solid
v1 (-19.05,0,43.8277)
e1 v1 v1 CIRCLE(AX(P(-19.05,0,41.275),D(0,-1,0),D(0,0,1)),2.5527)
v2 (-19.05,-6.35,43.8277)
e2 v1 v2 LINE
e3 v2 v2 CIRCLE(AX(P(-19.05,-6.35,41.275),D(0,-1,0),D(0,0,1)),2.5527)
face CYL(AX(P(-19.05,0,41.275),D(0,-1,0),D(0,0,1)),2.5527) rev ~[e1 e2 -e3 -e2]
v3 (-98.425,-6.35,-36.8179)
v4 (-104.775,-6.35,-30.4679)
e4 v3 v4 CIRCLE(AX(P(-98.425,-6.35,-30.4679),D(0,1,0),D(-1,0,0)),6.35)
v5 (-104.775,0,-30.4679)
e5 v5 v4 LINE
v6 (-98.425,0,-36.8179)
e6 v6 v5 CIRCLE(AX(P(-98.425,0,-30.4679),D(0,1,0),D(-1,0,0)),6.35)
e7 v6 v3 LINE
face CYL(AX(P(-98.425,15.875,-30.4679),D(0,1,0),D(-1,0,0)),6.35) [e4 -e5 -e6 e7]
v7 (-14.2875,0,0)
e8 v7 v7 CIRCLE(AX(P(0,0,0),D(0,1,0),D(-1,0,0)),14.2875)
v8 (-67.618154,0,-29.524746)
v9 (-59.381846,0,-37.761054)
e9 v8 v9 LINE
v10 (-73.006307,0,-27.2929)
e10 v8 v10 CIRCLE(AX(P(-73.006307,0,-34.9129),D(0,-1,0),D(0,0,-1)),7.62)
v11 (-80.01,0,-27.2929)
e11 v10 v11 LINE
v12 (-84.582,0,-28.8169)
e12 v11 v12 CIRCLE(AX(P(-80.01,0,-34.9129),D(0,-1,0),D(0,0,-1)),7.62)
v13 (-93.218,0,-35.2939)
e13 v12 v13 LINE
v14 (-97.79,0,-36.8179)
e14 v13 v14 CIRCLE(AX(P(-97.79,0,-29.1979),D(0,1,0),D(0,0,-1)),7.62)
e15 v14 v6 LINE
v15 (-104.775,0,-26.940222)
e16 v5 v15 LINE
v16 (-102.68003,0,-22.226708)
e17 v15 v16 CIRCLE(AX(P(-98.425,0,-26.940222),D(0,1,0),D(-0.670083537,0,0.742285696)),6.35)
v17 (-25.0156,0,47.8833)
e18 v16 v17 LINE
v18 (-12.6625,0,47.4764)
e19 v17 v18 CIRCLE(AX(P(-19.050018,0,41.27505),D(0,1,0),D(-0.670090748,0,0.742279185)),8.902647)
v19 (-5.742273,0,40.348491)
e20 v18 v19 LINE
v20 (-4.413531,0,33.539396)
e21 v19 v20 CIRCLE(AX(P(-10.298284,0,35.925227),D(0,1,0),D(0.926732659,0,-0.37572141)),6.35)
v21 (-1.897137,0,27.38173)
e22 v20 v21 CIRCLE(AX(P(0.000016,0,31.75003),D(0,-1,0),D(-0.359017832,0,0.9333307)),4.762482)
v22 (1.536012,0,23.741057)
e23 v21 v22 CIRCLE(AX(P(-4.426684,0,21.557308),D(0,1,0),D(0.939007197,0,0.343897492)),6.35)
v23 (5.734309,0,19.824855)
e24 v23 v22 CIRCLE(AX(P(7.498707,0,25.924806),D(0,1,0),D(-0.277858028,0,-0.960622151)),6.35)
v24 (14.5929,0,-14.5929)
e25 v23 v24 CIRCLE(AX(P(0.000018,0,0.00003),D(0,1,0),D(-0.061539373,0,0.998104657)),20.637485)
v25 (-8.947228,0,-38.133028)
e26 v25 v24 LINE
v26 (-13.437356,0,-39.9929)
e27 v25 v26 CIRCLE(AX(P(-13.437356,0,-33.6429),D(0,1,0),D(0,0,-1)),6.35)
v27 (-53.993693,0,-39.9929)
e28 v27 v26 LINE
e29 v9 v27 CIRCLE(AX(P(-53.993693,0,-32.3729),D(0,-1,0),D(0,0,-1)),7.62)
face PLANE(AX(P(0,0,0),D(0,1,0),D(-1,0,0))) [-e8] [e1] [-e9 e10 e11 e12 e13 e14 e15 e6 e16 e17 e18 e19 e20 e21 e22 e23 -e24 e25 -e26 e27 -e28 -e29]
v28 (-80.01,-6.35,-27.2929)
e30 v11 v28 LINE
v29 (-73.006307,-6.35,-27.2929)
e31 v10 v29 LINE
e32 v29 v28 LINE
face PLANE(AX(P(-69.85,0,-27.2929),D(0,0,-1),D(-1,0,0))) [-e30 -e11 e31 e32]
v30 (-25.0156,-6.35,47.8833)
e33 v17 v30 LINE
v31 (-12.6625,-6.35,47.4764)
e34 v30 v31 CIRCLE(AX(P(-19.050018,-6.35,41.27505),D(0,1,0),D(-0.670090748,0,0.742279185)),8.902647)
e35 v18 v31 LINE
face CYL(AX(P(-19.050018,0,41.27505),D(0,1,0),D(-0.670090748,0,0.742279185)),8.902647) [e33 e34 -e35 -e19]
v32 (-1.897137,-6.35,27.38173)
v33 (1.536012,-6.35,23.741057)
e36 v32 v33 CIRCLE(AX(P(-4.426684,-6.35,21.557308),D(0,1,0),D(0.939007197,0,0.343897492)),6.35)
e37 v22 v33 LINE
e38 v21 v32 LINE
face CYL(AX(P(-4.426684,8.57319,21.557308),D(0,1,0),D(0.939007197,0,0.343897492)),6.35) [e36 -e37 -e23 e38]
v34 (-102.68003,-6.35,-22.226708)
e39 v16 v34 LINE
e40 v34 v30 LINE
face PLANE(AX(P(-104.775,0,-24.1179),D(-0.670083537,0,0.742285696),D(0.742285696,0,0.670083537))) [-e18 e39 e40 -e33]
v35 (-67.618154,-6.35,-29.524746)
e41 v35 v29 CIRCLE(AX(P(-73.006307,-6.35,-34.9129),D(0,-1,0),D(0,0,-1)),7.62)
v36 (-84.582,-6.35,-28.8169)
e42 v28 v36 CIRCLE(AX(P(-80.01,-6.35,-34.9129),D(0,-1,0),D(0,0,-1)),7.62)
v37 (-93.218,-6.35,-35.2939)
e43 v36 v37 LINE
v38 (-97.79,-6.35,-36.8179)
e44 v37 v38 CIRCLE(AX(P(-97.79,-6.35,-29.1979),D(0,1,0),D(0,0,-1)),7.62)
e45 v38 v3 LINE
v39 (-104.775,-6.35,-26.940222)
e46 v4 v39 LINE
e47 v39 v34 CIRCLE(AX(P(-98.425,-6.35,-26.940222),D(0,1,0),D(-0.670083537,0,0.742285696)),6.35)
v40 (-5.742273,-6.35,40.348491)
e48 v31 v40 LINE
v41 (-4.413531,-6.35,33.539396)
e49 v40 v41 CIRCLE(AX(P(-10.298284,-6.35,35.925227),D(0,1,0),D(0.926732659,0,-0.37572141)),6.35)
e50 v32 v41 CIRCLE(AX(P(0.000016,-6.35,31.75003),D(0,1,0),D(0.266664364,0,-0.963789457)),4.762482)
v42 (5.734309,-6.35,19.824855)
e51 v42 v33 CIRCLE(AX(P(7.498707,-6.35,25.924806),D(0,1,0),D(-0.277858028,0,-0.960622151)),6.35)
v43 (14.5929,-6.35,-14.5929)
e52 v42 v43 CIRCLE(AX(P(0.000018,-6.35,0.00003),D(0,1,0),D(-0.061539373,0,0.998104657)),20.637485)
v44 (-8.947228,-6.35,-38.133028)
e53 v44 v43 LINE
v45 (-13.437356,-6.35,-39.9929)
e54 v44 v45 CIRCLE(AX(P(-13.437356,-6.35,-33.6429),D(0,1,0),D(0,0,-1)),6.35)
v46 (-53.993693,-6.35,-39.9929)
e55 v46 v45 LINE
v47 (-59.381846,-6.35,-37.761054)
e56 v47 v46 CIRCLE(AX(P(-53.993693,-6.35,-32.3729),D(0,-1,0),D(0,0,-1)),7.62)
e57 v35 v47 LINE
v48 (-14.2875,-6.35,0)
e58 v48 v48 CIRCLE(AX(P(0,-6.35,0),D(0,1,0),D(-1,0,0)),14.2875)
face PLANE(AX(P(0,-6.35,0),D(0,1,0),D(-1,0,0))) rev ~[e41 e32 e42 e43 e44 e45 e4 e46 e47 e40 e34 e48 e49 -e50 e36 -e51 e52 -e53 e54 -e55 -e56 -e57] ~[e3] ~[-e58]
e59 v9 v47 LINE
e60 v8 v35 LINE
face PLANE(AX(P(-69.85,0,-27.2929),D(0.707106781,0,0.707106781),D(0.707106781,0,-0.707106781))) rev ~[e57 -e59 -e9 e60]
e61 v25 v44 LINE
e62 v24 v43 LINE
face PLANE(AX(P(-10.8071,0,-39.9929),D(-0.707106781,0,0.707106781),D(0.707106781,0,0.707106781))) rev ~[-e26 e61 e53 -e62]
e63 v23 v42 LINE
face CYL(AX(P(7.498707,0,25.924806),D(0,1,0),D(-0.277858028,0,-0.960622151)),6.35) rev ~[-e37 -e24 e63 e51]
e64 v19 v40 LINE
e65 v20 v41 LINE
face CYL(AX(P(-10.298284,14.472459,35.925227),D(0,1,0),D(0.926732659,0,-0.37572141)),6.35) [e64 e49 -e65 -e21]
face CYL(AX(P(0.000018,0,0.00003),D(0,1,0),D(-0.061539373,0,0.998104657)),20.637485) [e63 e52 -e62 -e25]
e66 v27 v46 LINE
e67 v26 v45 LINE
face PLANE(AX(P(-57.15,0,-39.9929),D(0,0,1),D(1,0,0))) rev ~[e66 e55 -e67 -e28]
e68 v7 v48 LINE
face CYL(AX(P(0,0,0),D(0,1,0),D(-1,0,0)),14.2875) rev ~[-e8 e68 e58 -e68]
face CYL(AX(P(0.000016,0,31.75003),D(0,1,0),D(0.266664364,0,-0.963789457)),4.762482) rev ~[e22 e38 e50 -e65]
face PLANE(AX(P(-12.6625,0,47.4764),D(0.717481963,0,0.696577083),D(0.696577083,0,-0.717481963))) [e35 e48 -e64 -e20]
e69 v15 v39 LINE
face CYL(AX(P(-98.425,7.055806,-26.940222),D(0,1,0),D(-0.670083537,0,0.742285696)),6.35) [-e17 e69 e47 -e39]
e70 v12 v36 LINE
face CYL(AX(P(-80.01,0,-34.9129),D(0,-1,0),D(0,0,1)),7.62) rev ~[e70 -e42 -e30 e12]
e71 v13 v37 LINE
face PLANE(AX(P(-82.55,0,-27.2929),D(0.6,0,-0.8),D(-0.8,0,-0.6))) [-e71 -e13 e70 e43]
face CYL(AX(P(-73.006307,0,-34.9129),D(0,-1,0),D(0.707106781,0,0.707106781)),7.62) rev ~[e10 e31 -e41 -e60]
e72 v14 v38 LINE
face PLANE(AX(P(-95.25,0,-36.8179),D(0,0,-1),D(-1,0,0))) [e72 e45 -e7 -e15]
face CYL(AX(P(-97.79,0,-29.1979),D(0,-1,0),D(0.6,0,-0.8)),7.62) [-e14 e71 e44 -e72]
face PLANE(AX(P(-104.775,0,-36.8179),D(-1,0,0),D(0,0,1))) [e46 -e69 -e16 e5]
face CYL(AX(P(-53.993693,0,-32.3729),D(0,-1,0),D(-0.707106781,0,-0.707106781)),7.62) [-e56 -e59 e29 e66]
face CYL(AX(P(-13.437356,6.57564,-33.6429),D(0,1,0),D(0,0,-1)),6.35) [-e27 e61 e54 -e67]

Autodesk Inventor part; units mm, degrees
ref_plane "YZ Plane" through (0, 0, 0) normal (1, 0, 0) x (0, 1, 0)
ref_plane "XZ Plane" through (0, 0, 0) normal (0, 1, 0) x (-1, 0, 0)
ref_plane "XY Plane" through (0, 0, 0) normal (0, 0, 1) x (1, 0, 0)
sketch "Sketch1" plane through (0, 0, 0) normal (0, 1, 0) x (-1, 0, 0)
  circle A0 centre (76.2, -63.1164) radius 16.7005 construction
  line L0 (69.85, -27.2929) -> (82.55, -27.2929)
  line L1 (82.55, -27.2929) -> (95.25, -36.8179)
  line L2 (95.25, -36.8179) -> (104.775, -36.8179)
  line L3 (104.775, -36.8179) -> (104.775, -24.1179)
  line L4 (104.775, -24.1179) -> (25.0156, 47.8833)
  line L5 (69.85, -27.2929) -> (57.15, -39.9929)
  line L6 (57.15, -39.9929) -> (10.8071, -39.9929)
  circle A1 centre (0, 0) radius 14.2875
  circle A2 centre (0, 0) radius 20.6375 construction
  line L7 (10.8071, -39.9929) -> (-14.5929, -14.5929)
  circle A3 centre (0, 31.75) radius 4.7625 construction
  circle A4 centre (19.05, 41.275) radius 2.5527 construction
  circle A5 centre (19.05, 41.275) radius 8.9027 construction
  line L8 (12.6625, 47.4764) -> (1.7098, 36.195)
  arc A6 (-1.27, 27.16) -> (1.7098, 36.195) centre (0, 31.75) ccw
  arc A7 (1.27, 20.5984) -> (-14.5929, -14.5929) centre (0, 0) ccw
  arc A8 (25.0156, 47.8833) -> (12.6625, 47.4764) centre (19.05, 41.275) ccw
  line L9 (-1.27, 27.16) -> (1.27, 20.5984)
  point P0 (76.2, -27.2929)
  dimension "d0" = 33.401
  dimension "d1" = 28.575
  dimension "d2" = 6.35
  dimension "d3" = 9.525
  dimension "d4" = 31.75
  dimension "d5" = 5.1054
  dimension "d6" = 6.35
  dimension "d7" = 19.05
  dimension "d8" = 9.525
  dimension "d9" = 25.4
  dimension "d10" = 25.4
  dimension "d11" = 12.7
  dimension "d12" = 12.7
  dimension "d13" = 12.7
  dimension "d15" = 76.2
  dimension "d16" = 76.2
  dimension "d17" = 12.7
  dimension "d18" = 3.175
  dimension "d19" = 9.525
  dimension "d20" = 12.7
  dimension "d34" = 4.445
  dimension "d35" = 1.27
  dimension "d36" = 1.27
extrude "Extrusion1" add sketch "Sketch1" against normal blind 6.35
fillet "Fillet1" radius 6.35 6 edges at (-1.7098, -3.175, 36.195) (-10.8071, -3.175, -39.9929) (-104.775, -3.175, -24.1179) (-104.775, -3.175, -36.8179) (1.27, -3.175, 27.16) (-1.27, -3.175, 20.5984)
fillet "Fillet2" radius 7.62 4 edges at (-69.85, -3.175, -27.2929) (-82.55, -3.175, -27.2929) (-57.15, -3.175, -39.9929) (-95.25, -3.175, -36.8179)
hole "Hole1" at (-19.05, 0, 41.275) direction (0, -1, 0) diameter 5.1054 end through all clearance for "Flat Head Machine Screw (82)" size "#10" standard "Ansi Unified Screw Threads"
equation "\"d17\" = d12"
properties part number "CL4-004" material "Aluminum 6061"
